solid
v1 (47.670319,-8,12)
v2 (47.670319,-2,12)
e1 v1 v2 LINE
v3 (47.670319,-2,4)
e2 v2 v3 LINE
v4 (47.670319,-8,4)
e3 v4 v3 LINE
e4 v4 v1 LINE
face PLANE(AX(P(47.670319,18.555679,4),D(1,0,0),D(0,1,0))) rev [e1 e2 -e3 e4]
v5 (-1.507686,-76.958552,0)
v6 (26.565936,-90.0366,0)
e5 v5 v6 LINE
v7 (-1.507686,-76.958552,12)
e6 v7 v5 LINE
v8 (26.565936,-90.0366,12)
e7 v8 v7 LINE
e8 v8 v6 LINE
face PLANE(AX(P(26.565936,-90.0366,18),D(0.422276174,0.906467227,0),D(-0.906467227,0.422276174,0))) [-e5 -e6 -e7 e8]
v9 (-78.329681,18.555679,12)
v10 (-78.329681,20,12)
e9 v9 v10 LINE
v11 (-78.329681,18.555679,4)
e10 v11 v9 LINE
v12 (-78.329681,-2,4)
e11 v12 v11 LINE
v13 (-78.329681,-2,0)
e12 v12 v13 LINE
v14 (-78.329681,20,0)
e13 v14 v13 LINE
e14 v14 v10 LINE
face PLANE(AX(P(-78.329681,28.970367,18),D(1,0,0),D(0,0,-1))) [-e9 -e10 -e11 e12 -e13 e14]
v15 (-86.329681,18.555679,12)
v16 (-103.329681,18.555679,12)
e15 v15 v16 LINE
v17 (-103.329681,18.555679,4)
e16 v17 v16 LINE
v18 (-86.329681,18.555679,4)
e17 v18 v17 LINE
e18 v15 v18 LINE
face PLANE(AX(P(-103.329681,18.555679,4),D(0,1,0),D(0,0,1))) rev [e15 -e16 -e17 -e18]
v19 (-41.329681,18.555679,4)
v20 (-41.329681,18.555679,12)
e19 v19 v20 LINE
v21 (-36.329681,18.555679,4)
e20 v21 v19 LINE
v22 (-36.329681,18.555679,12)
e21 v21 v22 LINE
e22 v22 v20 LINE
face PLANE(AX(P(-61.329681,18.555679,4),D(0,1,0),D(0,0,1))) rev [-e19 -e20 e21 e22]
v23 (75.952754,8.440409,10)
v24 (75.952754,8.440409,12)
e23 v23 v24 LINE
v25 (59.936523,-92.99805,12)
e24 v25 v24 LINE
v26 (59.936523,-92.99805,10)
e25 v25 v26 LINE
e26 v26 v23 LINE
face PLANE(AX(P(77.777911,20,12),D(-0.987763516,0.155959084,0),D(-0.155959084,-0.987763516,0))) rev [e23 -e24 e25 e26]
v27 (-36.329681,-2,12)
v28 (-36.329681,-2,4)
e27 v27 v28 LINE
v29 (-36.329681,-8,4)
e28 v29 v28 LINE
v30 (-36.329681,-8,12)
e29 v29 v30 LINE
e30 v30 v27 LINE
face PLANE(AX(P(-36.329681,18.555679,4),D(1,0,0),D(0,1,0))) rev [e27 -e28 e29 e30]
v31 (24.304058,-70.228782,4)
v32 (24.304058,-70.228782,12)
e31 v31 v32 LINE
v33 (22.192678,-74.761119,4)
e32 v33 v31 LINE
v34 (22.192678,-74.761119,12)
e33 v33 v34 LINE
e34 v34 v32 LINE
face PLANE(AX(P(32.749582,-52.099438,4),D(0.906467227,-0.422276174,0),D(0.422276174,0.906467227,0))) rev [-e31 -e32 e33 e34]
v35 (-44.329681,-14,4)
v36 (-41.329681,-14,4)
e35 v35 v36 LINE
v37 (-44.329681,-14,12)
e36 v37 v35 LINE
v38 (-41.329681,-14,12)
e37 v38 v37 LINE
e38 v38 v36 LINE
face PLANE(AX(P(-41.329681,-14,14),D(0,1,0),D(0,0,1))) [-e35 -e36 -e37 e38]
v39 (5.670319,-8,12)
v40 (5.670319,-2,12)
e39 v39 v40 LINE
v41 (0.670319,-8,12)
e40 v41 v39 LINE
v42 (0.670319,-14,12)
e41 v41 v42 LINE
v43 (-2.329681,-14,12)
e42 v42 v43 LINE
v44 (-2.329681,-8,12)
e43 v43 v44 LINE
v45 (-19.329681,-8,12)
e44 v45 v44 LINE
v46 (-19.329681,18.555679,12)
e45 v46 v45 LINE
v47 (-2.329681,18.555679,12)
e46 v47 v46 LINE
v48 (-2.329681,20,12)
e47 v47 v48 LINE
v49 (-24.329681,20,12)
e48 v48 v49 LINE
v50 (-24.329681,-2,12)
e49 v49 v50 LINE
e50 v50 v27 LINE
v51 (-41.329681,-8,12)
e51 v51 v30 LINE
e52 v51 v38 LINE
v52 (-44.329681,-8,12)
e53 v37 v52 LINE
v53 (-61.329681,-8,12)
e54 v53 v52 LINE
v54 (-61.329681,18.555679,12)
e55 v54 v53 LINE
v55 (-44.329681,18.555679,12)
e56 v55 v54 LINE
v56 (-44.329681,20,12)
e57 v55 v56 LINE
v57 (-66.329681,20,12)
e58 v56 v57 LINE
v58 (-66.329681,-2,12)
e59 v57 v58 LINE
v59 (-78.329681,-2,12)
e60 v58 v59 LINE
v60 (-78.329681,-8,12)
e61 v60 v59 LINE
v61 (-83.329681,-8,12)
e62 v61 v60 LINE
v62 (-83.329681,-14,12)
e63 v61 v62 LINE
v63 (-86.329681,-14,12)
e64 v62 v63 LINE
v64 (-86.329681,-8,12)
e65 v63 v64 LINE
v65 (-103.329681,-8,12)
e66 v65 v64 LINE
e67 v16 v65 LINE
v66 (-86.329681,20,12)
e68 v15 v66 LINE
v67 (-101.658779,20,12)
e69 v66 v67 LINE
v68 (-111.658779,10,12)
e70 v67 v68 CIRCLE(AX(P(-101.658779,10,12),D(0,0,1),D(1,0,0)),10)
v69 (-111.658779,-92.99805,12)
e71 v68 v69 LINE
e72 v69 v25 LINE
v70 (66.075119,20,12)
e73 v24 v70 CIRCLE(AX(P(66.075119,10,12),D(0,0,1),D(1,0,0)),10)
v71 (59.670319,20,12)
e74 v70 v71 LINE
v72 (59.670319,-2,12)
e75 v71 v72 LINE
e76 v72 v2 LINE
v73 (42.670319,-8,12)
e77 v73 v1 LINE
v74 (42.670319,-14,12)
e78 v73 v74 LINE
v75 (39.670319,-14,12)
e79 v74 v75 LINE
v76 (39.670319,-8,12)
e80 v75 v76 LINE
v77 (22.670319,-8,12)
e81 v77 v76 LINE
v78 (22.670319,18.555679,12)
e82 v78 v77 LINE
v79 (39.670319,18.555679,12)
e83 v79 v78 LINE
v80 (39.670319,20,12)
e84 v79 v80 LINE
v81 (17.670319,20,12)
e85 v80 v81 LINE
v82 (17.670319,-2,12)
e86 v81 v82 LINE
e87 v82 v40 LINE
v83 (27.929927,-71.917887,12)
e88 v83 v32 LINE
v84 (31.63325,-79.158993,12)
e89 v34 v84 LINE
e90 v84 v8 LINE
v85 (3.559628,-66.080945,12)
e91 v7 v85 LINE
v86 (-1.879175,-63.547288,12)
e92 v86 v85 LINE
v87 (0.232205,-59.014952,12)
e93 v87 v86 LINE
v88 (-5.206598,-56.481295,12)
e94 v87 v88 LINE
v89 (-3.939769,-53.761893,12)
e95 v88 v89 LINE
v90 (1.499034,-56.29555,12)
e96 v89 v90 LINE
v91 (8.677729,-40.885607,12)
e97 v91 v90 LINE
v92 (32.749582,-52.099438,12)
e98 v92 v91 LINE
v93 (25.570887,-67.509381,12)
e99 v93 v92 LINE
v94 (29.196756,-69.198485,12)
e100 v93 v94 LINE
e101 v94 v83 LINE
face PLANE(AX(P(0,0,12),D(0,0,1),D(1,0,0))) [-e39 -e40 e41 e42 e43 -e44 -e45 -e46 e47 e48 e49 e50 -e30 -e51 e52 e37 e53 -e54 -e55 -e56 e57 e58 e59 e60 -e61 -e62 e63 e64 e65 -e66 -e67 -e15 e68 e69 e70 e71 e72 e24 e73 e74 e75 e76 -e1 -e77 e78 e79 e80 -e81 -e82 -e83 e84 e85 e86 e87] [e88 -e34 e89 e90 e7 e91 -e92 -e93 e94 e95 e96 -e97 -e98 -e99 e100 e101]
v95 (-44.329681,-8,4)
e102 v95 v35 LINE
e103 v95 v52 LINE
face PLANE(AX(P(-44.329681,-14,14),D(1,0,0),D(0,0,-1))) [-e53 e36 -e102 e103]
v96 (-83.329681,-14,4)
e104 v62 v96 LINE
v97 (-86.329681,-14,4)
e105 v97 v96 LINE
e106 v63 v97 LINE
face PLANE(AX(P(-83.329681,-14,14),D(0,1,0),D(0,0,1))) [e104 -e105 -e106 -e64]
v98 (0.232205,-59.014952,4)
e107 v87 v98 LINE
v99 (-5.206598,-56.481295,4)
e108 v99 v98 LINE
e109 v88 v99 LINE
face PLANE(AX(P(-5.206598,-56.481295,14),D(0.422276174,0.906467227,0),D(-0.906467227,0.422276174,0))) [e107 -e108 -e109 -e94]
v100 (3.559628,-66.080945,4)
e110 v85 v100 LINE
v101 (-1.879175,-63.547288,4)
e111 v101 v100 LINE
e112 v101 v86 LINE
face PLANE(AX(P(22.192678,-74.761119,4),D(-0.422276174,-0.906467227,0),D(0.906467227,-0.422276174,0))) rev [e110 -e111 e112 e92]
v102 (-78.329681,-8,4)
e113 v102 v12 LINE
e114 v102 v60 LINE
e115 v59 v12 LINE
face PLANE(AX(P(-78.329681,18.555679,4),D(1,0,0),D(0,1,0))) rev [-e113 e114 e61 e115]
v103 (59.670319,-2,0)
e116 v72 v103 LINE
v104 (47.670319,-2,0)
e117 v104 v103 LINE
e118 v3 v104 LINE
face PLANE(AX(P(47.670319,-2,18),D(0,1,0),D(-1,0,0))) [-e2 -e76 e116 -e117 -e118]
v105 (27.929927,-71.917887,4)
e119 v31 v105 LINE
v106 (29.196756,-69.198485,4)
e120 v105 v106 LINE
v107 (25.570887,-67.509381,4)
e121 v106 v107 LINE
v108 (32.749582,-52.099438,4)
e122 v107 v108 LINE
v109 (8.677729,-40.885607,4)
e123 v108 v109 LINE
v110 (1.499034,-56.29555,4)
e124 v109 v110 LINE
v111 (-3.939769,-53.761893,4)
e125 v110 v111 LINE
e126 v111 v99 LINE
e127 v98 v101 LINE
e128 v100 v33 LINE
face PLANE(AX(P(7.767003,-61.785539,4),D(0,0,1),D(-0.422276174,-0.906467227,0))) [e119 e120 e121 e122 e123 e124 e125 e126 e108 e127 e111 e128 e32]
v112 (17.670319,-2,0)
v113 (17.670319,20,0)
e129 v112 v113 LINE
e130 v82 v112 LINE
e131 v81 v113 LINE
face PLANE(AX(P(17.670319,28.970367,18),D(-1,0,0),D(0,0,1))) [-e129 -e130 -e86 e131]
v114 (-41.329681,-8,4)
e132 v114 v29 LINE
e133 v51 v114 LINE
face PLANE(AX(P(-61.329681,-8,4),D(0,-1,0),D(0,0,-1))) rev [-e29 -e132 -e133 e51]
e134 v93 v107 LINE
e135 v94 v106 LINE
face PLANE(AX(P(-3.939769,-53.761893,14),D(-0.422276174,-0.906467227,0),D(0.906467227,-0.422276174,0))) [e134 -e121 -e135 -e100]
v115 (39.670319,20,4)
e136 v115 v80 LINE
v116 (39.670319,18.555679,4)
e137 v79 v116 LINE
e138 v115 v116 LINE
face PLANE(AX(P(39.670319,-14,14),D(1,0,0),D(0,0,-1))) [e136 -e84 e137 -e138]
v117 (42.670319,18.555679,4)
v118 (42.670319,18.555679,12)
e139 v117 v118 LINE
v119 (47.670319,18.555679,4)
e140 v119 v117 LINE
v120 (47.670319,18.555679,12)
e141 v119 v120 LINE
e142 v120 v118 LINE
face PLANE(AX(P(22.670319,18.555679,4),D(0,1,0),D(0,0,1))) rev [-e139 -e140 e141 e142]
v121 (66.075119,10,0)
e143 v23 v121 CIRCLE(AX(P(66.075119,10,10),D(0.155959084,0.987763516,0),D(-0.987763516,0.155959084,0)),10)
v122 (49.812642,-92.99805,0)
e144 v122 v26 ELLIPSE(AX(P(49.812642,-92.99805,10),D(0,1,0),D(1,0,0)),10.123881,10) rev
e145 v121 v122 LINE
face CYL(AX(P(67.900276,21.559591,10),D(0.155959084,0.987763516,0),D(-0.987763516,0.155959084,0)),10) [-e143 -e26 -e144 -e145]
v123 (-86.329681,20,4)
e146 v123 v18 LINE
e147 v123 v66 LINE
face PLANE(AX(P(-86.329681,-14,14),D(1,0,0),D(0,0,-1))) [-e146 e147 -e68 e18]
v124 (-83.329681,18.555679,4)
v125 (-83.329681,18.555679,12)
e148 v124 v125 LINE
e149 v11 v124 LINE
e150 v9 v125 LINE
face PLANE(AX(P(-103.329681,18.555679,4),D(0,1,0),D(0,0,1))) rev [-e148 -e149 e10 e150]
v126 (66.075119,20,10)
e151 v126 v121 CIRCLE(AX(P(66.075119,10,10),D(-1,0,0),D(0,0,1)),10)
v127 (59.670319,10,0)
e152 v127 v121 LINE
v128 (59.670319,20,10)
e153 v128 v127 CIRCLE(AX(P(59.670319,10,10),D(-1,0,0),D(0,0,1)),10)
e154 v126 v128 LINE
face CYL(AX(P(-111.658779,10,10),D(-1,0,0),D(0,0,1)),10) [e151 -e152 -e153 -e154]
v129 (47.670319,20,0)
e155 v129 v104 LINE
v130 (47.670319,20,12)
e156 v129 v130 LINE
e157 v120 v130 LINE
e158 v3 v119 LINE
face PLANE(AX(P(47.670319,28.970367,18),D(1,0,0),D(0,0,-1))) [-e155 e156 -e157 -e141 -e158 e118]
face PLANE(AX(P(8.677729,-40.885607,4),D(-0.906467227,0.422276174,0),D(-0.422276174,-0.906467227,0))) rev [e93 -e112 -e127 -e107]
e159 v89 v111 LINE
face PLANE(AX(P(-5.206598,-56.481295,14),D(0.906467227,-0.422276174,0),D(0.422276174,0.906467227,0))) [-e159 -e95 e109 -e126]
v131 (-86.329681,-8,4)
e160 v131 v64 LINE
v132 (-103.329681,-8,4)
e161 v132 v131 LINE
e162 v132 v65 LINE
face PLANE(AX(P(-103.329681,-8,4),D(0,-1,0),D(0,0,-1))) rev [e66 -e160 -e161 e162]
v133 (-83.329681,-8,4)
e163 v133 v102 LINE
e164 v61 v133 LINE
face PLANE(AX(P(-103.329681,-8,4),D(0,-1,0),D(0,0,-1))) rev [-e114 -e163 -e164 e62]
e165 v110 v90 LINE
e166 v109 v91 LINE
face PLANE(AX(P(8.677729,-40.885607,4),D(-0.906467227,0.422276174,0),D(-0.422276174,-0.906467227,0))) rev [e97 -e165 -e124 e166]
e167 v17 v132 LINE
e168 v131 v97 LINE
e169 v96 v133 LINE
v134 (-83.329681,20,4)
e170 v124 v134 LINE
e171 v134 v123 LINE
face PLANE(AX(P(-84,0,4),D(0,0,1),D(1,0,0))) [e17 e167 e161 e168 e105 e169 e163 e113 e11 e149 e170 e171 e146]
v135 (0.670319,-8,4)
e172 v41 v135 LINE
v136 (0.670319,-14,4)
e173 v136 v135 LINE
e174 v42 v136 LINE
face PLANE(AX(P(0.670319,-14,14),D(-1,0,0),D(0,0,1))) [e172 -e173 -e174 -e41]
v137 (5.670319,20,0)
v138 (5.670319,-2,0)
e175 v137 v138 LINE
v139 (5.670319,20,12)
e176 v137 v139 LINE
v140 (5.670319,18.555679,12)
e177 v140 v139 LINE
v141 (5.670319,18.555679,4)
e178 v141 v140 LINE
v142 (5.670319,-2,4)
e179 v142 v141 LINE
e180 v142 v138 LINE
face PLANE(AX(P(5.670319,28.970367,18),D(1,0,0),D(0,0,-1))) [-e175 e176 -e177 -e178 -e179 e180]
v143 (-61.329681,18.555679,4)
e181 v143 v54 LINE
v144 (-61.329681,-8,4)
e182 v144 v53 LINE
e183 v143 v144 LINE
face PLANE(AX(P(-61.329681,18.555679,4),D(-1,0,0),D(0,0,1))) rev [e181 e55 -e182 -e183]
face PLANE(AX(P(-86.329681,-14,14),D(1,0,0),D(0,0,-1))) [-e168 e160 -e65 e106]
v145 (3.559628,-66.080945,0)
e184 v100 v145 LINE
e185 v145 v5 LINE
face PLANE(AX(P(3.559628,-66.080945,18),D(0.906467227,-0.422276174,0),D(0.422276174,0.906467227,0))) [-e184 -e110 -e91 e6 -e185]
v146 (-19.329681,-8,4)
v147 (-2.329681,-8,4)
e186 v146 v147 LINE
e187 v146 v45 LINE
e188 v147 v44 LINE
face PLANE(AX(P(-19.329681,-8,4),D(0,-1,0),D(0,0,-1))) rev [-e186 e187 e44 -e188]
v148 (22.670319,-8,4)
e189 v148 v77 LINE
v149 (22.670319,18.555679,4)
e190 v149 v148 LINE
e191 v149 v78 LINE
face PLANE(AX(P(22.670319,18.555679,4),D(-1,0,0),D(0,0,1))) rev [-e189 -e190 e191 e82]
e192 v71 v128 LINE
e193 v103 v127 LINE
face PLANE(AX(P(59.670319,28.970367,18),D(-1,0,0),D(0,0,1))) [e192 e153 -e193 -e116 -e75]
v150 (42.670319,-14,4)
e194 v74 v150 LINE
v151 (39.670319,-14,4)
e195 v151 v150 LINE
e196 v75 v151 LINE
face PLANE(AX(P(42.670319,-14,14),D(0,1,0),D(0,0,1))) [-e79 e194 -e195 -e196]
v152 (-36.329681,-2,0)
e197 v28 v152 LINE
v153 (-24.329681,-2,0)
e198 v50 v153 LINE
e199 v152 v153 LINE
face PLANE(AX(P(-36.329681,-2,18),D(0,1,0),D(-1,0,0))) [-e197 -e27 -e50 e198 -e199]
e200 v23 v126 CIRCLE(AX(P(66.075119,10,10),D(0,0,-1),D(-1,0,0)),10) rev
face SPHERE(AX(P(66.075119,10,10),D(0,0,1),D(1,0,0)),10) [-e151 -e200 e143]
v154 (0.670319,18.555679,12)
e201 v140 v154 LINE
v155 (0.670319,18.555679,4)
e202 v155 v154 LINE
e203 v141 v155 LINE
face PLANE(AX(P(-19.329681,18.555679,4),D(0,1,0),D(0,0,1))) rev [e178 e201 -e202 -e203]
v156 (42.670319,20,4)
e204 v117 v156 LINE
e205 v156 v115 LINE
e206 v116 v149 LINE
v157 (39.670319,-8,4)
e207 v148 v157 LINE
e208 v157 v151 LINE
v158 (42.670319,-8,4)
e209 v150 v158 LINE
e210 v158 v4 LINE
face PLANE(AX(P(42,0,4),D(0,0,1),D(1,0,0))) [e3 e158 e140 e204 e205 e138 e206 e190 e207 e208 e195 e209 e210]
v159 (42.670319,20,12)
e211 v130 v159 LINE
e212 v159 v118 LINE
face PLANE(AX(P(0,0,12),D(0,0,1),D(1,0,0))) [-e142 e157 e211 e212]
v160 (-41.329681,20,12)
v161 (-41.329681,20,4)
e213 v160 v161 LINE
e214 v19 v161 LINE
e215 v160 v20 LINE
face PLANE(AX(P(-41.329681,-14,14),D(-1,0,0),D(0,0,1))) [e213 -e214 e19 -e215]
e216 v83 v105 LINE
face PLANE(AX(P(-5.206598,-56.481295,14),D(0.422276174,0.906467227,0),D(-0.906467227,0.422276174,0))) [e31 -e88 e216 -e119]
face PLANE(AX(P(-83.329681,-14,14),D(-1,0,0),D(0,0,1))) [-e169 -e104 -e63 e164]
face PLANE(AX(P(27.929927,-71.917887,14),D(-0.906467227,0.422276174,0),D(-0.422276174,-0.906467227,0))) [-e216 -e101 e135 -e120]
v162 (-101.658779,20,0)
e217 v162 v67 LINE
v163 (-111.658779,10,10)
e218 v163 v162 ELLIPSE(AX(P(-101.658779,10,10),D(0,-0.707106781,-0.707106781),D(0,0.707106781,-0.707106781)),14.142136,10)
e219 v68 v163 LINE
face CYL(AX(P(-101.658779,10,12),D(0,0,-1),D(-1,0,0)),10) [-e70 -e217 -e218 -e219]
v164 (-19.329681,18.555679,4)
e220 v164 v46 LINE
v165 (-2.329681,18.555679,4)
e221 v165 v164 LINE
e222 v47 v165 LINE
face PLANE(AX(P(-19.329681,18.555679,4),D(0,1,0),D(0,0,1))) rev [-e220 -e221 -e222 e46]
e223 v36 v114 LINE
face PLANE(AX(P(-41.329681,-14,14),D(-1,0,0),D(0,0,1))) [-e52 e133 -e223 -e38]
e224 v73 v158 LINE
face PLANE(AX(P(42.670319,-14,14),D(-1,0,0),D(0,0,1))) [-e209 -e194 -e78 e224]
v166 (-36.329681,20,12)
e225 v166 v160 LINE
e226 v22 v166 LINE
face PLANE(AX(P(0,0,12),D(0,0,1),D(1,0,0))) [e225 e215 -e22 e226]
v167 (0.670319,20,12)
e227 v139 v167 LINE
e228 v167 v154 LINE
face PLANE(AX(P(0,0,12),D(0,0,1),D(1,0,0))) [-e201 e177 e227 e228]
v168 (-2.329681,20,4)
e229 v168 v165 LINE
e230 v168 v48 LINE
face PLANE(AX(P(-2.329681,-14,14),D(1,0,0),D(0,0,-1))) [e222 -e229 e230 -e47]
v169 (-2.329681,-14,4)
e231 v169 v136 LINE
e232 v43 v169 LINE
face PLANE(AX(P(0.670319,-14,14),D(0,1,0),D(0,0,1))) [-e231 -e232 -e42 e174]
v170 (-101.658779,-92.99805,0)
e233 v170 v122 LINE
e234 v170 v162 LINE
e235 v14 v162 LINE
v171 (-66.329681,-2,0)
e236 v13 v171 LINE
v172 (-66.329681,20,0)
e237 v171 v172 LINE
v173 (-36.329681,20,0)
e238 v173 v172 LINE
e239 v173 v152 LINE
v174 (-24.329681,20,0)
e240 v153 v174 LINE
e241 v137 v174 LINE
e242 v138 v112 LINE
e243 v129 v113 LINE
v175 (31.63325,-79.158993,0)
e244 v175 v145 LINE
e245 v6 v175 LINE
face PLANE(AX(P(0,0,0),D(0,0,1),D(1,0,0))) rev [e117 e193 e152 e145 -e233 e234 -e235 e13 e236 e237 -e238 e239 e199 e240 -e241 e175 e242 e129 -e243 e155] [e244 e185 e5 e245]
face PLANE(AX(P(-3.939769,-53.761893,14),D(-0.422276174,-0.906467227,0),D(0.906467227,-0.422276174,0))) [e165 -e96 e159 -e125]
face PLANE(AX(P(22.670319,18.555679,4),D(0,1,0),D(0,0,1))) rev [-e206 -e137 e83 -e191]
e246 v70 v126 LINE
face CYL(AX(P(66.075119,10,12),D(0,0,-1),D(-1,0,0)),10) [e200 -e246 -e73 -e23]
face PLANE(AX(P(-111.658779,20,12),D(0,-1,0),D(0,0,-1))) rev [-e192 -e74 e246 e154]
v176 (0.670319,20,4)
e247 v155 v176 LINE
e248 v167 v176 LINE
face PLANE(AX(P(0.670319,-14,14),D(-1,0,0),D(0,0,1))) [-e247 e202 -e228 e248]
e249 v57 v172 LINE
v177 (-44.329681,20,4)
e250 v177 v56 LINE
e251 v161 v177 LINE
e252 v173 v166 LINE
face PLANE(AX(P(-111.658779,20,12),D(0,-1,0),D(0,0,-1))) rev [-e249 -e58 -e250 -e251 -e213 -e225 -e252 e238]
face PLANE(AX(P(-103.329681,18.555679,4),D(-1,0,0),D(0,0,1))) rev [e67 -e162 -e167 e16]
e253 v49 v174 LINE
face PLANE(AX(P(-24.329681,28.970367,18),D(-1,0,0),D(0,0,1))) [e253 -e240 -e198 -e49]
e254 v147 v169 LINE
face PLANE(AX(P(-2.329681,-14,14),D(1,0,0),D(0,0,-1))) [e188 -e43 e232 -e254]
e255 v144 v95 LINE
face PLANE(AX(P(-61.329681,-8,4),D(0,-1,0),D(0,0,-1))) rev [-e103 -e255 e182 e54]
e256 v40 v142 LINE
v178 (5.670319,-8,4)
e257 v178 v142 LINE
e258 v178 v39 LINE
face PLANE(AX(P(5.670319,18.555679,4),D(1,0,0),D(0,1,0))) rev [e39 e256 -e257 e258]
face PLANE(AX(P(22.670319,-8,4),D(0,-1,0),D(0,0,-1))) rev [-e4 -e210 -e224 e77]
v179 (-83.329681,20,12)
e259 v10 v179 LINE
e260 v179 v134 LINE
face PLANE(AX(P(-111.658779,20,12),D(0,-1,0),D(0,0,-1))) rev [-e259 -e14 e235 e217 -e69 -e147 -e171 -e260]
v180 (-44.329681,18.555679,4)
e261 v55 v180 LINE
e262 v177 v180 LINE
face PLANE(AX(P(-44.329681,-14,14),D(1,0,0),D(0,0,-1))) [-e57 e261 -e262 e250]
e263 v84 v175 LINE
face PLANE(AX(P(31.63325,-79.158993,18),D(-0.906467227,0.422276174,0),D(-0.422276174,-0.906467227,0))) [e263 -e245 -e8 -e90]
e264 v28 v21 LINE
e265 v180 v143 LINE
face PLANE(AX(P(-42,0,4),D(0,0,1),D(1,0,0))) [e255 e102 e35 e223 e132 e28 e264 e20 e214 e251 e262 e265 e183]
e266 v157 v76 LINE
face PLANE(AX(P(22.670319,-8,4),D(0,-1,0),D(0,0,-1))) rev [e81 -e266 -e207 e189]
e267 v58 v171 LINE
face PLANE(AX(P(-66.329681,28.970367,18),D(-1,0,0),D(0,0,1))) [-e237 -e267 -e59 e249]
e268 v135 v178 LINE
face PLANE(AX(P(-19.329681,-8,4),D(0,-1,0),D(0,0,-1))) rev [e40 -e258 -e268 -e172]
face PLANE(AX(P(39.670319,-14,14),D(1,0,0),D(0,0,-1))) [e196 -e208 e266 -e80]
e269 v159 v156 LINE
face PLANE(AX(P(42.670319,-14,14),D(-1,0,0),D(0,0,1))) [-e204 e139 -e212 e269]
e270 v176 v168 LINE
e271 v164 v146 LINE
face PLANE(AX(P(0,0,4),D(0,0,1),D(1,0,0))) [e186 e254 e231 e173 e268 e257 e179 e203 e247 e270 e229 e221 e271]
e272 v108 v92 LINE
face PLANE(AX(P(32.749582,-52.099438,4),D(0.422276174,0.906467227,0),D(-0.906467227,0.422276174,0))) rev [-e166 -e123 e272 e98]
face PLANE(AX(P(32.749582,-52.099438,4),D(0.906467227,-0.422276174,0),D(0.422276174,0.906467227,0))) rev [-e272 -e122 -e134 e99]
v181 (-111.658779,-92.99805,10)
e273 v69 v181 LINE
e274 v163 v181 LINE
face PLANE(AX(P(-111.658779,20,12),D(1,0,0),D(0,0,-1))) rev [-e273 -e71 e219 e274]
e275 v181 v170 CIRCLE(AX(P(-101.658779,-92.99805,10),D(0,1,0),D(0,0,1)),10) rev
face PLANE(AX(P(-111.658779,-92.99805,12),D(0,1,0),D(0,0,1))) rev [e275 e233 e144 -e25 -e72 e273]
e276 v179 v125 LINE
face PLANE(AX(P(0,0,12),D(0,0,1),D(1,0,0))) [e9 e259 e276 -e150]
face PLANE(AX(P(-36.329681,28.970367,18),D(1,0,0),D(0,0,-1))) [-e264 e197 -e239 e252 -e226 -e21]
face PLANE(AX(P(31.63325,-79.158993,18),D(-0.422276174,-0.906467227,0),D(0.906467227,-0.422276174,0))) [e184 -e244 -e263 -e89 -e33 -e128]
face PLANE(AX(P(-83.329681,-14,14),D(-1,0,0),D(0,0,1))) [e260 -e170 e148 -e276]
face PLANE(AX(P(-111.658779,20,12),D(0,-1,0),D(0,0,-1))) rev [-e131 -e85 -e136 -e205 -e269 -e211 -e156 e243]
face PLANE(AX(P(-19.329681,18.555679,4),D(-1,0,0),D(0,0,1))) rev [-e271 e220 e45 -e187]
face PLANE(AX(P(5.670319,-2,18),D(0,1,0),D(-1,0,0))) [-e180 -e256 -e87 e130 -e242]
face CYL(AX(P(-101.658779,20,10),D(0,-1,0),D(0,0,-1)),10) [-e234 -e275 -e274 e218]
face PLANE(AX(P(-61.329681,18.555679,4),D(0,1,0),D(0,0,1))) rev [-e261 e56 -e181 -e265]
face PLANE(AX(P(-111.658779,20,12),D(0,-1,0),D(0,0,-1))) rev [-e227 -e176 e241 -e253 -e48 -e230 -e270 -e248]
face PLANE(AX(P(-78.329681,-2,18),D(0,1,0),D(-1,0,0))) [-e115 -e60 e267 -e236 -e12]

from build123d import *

# Parameters (mm, degrees)
BOSS_EXTRUDE1_DEPTH       = 12
SKETCH2_W                 = 25
SKETCH2_H                 = 26.555679241
CUT_EXTRUDE2_DEPTH        = 8
CUT_EXTRUDE8_START        = 4
SKETCH3_W                 = 3
SKETCH3_H                 = 36.555679241
CUT_EXTRUDE8_DEPTH        = 10
SKETCH5_W                 = 12
SKETCH5_H                 = 30.970366581
CUT_EXTRUDE10_DEPTH       = 18
LPATTERN1_COUNT           = 3
LPATTERN1_PITCH           = 42
LPATTERN2_COUNT           = 2
LPATTERN2_PITCH           = 42
CRVPATTERN1_START         = -70.397064899
CRVPATTERN1_OUTLINE_W     = 20.555679241
CRVPATTERN1_OUTLINE_H     = 8
CRVPATTERN1_DEPTH         = 37
CRVPATTERN1_2_DEPTH       = 12
CRVPATTERN1_START_2       = -58.397064899
CRVPATTERN1_3_OUTLINE_W   = 6
CRVPATTERN1_3_OUTLINE_H   = 8
CRVPATTERN1_3_DEPTH       = 25
CRVPATTERN1_START_3       = -53.397064899
CRVPATTERN1_4_OUTLINE_W   = 4
CRVPATTERN1_4_OUTLINE_H   = 8
CRVPATTERN1_4_OUTLINE_W_2 = 6
CRVPATTERN1_4_DEPTH       = 3
FILLET1_R                 = 10
FILLET2_R                 = 10
FILLET3_R                 = 10


# Read off the part's stored shape, not the designer's step: CrvPattern1
with BuildPart() as part:
    # Sketch1 → Boss-Extrude1 (new body)
    with BuildSketch(Plane.XY):
        Polygon((-111.658778955, 20), (77.777911134, 20), (59.936522952, -92.998049549), (-111.658778955, -92.998049549), align=None)
    extrude(amount=BOSS_EXTRUDE1_DEPTH)

    # Sketch2 → Cut-Extrude2 (cut)
    with BuildSketch(Plane.XY.offset(12)):
        with Locations((-6.829680892, 5.27783962)):
            Rectangle(SKETCH2_W, SKETCH2_H)
    cut_extrude2 = extrude(amount=-CUT_EXTRUDE2_DEPTH, mode=Mode.SUBTRACT)

    # Sketch3 → Cut-Extrude8 (cut)
    with BuildSketch(Plane.XY.offset(CUT_EXTRUDE8_START)):
        with Locations((-0.829680892, 4.27783962)):
            Rectangle(SKETCH3_W, SKETCH3_H)
    cut_extrude8 = extrude(amount=CUT_EXTRUDE8_DEPTH, mode=Mode.SUBTRACT)

    # Sketch5 → Cut-Extrude10 (cut)
    with BuildSketch(Plane.XY):
        with Locations((11.670319108, 13.485183291)):
            Rectangle(SKETCH5_W, SKETCH5_H)
    cut_extrude10 = extrude(amount=CUT_EXTRUDE10_DEPTH, mode=Mode.SUBTRACT)

    # LPattern1: Cut-Extrude2, Cut-Extrude8, Cut-Extrude10 ×3
    with Locations(*[(-i * LPATTERN1_PITCH, 0, 0) for i in range(1, LPATTERN1_COUNT)]):
        add(cut_extrude2, mode=Mode.SUBTRACT)
        add(cut_extrude8, mode=Mode.SUBTRACT)
        add(cut_extrude10, mode=Mode.SUBTRACT)

    # LPattern2: Cut-Extrude2, Cut-Extrude8, Cut-Extrude10 ×2
    with Locations(*[(i * LPATTERN2_PITCH, 0, 0) for i in range(1, LPATTERN2_COUNT)]):
        add(cut_extrude2, mode=Mode.SUBTRACT)
        add(cut_extrude8, mode=Mode.SUBTRACT)
        add(cut_extrude10, mode=Mode.SUBTRACT)

    # CrvPattern1 outline → CrvPattern1 (cut)
    with BuildSketch(Plane(origin=(0, 0, 0), x_dir=(0.906467226735628, -0.42227617367573506, 0), z_dir=(0.42227617367573506, 0.9064672267356281, 0)).offset(CRVPATTERN1_START)):
        with Locations((41.40893435, -8)):
            Rectangle(CRVPATTERN1_OUTLINE_W, CRVPATTERN1_OUTLINE_H)
    extrude(amount=CRVPATTERN1_DEPTH, mode=Mode.SUBTRACT)

    # CrvPattern1 2 outline → CrvPattern1 2 (cut)
    with BuildSketch(Plane(origin=(0, 0, 0), x_dir=(0.906467226735628, -0.42227617367573506, 0), z_dir=(0.42227617367573506, 0.9064672267356281, 0)).offset(CRVPATTERN1_START)):
        Polygon((51.68677397, -4), (51.68677397, -12), (62.10146131, -12), (62.10146131, 0), (31.131094729, 0), (31.131094729, -4), align=None)
    extrude(amount=CRVPATTERN1_2_DEPTH, mode=Mode.SUBTRACT)

    # CrvPattern1 3 outline → CrvPattern1 3 (cut)
    with BuildSketch(Plane(origin=(0, 0, 0), x_dir=(0.906467226735628, -0.42227617367573506, 0), z_dir=(0.42227617367573506, 0.9064672267356281, 0)).offset(CRVPATTERN1_START_2)):
        with Locations((28.131094729, -8)):
            Rectangle(CRVPATTERN1_3_OUTLINE_W, CRVPATTERN1_3_OUTLINE_H)
    extrude(amount=CRVPATTERN1_3_DEPTH, mode=Mode.SUBTRACT)

    # CrvPattern1 4 outline → CrvPattern1 4 (cut)
    with BuildSketch(Plane(origin=(0, 0, 0), x_dir=(0.906467226735628, -0.42227617367573506, 0), z_dir=(0.42227617367573506, 0.9064672267356281, 0)).offset(CRVPATTERN1_START_3)):
        with Locations((53.68677397, -8)):
            Rectangle(CRVPATTERN1_4_OUTLINE_W, CRVPATTERN1_4_OUTLINE_H)
        with Locations((22.131094729, -8)):
            Rectangle(CRVPATTERN1_4_OUTLINE_W_2, CRVPATTERN1_4_OUTLINE_H)
    extrude(amount=CRVPATTERN1_4_DEPTH, mode=Mode.SUBTRACT)

    # Fillet1
    fillet1_edges = [part.edges().sort_by_distance(p)[0] for p in [
        (77.777911134, 20, 6),
    ]]
    fillet(fillet1_edges, radius=FILLET1_R)

    # Fillet2
    fillet2_edges = [part.edges().sort_by_distance(p)[0] for p in [
        (-111.658778955, -36.499024774, 0),
        (-111.658778955, 20, 6),
    ]]
    fillet(fillet2_edges, radius=FILLET2_R)

    # Fillet3
    fillet3_edges = [part.edges().sort_by_distance(p)[0] for p in [
        (62.872719189, 20, 0),
        (73.677615847, 16.496310167, 0),
        (67.944638692, -42.278820195, 0),
    ]]
    fillet(fillet3_edges, radius=FILLET3_R)


solid = part.part
